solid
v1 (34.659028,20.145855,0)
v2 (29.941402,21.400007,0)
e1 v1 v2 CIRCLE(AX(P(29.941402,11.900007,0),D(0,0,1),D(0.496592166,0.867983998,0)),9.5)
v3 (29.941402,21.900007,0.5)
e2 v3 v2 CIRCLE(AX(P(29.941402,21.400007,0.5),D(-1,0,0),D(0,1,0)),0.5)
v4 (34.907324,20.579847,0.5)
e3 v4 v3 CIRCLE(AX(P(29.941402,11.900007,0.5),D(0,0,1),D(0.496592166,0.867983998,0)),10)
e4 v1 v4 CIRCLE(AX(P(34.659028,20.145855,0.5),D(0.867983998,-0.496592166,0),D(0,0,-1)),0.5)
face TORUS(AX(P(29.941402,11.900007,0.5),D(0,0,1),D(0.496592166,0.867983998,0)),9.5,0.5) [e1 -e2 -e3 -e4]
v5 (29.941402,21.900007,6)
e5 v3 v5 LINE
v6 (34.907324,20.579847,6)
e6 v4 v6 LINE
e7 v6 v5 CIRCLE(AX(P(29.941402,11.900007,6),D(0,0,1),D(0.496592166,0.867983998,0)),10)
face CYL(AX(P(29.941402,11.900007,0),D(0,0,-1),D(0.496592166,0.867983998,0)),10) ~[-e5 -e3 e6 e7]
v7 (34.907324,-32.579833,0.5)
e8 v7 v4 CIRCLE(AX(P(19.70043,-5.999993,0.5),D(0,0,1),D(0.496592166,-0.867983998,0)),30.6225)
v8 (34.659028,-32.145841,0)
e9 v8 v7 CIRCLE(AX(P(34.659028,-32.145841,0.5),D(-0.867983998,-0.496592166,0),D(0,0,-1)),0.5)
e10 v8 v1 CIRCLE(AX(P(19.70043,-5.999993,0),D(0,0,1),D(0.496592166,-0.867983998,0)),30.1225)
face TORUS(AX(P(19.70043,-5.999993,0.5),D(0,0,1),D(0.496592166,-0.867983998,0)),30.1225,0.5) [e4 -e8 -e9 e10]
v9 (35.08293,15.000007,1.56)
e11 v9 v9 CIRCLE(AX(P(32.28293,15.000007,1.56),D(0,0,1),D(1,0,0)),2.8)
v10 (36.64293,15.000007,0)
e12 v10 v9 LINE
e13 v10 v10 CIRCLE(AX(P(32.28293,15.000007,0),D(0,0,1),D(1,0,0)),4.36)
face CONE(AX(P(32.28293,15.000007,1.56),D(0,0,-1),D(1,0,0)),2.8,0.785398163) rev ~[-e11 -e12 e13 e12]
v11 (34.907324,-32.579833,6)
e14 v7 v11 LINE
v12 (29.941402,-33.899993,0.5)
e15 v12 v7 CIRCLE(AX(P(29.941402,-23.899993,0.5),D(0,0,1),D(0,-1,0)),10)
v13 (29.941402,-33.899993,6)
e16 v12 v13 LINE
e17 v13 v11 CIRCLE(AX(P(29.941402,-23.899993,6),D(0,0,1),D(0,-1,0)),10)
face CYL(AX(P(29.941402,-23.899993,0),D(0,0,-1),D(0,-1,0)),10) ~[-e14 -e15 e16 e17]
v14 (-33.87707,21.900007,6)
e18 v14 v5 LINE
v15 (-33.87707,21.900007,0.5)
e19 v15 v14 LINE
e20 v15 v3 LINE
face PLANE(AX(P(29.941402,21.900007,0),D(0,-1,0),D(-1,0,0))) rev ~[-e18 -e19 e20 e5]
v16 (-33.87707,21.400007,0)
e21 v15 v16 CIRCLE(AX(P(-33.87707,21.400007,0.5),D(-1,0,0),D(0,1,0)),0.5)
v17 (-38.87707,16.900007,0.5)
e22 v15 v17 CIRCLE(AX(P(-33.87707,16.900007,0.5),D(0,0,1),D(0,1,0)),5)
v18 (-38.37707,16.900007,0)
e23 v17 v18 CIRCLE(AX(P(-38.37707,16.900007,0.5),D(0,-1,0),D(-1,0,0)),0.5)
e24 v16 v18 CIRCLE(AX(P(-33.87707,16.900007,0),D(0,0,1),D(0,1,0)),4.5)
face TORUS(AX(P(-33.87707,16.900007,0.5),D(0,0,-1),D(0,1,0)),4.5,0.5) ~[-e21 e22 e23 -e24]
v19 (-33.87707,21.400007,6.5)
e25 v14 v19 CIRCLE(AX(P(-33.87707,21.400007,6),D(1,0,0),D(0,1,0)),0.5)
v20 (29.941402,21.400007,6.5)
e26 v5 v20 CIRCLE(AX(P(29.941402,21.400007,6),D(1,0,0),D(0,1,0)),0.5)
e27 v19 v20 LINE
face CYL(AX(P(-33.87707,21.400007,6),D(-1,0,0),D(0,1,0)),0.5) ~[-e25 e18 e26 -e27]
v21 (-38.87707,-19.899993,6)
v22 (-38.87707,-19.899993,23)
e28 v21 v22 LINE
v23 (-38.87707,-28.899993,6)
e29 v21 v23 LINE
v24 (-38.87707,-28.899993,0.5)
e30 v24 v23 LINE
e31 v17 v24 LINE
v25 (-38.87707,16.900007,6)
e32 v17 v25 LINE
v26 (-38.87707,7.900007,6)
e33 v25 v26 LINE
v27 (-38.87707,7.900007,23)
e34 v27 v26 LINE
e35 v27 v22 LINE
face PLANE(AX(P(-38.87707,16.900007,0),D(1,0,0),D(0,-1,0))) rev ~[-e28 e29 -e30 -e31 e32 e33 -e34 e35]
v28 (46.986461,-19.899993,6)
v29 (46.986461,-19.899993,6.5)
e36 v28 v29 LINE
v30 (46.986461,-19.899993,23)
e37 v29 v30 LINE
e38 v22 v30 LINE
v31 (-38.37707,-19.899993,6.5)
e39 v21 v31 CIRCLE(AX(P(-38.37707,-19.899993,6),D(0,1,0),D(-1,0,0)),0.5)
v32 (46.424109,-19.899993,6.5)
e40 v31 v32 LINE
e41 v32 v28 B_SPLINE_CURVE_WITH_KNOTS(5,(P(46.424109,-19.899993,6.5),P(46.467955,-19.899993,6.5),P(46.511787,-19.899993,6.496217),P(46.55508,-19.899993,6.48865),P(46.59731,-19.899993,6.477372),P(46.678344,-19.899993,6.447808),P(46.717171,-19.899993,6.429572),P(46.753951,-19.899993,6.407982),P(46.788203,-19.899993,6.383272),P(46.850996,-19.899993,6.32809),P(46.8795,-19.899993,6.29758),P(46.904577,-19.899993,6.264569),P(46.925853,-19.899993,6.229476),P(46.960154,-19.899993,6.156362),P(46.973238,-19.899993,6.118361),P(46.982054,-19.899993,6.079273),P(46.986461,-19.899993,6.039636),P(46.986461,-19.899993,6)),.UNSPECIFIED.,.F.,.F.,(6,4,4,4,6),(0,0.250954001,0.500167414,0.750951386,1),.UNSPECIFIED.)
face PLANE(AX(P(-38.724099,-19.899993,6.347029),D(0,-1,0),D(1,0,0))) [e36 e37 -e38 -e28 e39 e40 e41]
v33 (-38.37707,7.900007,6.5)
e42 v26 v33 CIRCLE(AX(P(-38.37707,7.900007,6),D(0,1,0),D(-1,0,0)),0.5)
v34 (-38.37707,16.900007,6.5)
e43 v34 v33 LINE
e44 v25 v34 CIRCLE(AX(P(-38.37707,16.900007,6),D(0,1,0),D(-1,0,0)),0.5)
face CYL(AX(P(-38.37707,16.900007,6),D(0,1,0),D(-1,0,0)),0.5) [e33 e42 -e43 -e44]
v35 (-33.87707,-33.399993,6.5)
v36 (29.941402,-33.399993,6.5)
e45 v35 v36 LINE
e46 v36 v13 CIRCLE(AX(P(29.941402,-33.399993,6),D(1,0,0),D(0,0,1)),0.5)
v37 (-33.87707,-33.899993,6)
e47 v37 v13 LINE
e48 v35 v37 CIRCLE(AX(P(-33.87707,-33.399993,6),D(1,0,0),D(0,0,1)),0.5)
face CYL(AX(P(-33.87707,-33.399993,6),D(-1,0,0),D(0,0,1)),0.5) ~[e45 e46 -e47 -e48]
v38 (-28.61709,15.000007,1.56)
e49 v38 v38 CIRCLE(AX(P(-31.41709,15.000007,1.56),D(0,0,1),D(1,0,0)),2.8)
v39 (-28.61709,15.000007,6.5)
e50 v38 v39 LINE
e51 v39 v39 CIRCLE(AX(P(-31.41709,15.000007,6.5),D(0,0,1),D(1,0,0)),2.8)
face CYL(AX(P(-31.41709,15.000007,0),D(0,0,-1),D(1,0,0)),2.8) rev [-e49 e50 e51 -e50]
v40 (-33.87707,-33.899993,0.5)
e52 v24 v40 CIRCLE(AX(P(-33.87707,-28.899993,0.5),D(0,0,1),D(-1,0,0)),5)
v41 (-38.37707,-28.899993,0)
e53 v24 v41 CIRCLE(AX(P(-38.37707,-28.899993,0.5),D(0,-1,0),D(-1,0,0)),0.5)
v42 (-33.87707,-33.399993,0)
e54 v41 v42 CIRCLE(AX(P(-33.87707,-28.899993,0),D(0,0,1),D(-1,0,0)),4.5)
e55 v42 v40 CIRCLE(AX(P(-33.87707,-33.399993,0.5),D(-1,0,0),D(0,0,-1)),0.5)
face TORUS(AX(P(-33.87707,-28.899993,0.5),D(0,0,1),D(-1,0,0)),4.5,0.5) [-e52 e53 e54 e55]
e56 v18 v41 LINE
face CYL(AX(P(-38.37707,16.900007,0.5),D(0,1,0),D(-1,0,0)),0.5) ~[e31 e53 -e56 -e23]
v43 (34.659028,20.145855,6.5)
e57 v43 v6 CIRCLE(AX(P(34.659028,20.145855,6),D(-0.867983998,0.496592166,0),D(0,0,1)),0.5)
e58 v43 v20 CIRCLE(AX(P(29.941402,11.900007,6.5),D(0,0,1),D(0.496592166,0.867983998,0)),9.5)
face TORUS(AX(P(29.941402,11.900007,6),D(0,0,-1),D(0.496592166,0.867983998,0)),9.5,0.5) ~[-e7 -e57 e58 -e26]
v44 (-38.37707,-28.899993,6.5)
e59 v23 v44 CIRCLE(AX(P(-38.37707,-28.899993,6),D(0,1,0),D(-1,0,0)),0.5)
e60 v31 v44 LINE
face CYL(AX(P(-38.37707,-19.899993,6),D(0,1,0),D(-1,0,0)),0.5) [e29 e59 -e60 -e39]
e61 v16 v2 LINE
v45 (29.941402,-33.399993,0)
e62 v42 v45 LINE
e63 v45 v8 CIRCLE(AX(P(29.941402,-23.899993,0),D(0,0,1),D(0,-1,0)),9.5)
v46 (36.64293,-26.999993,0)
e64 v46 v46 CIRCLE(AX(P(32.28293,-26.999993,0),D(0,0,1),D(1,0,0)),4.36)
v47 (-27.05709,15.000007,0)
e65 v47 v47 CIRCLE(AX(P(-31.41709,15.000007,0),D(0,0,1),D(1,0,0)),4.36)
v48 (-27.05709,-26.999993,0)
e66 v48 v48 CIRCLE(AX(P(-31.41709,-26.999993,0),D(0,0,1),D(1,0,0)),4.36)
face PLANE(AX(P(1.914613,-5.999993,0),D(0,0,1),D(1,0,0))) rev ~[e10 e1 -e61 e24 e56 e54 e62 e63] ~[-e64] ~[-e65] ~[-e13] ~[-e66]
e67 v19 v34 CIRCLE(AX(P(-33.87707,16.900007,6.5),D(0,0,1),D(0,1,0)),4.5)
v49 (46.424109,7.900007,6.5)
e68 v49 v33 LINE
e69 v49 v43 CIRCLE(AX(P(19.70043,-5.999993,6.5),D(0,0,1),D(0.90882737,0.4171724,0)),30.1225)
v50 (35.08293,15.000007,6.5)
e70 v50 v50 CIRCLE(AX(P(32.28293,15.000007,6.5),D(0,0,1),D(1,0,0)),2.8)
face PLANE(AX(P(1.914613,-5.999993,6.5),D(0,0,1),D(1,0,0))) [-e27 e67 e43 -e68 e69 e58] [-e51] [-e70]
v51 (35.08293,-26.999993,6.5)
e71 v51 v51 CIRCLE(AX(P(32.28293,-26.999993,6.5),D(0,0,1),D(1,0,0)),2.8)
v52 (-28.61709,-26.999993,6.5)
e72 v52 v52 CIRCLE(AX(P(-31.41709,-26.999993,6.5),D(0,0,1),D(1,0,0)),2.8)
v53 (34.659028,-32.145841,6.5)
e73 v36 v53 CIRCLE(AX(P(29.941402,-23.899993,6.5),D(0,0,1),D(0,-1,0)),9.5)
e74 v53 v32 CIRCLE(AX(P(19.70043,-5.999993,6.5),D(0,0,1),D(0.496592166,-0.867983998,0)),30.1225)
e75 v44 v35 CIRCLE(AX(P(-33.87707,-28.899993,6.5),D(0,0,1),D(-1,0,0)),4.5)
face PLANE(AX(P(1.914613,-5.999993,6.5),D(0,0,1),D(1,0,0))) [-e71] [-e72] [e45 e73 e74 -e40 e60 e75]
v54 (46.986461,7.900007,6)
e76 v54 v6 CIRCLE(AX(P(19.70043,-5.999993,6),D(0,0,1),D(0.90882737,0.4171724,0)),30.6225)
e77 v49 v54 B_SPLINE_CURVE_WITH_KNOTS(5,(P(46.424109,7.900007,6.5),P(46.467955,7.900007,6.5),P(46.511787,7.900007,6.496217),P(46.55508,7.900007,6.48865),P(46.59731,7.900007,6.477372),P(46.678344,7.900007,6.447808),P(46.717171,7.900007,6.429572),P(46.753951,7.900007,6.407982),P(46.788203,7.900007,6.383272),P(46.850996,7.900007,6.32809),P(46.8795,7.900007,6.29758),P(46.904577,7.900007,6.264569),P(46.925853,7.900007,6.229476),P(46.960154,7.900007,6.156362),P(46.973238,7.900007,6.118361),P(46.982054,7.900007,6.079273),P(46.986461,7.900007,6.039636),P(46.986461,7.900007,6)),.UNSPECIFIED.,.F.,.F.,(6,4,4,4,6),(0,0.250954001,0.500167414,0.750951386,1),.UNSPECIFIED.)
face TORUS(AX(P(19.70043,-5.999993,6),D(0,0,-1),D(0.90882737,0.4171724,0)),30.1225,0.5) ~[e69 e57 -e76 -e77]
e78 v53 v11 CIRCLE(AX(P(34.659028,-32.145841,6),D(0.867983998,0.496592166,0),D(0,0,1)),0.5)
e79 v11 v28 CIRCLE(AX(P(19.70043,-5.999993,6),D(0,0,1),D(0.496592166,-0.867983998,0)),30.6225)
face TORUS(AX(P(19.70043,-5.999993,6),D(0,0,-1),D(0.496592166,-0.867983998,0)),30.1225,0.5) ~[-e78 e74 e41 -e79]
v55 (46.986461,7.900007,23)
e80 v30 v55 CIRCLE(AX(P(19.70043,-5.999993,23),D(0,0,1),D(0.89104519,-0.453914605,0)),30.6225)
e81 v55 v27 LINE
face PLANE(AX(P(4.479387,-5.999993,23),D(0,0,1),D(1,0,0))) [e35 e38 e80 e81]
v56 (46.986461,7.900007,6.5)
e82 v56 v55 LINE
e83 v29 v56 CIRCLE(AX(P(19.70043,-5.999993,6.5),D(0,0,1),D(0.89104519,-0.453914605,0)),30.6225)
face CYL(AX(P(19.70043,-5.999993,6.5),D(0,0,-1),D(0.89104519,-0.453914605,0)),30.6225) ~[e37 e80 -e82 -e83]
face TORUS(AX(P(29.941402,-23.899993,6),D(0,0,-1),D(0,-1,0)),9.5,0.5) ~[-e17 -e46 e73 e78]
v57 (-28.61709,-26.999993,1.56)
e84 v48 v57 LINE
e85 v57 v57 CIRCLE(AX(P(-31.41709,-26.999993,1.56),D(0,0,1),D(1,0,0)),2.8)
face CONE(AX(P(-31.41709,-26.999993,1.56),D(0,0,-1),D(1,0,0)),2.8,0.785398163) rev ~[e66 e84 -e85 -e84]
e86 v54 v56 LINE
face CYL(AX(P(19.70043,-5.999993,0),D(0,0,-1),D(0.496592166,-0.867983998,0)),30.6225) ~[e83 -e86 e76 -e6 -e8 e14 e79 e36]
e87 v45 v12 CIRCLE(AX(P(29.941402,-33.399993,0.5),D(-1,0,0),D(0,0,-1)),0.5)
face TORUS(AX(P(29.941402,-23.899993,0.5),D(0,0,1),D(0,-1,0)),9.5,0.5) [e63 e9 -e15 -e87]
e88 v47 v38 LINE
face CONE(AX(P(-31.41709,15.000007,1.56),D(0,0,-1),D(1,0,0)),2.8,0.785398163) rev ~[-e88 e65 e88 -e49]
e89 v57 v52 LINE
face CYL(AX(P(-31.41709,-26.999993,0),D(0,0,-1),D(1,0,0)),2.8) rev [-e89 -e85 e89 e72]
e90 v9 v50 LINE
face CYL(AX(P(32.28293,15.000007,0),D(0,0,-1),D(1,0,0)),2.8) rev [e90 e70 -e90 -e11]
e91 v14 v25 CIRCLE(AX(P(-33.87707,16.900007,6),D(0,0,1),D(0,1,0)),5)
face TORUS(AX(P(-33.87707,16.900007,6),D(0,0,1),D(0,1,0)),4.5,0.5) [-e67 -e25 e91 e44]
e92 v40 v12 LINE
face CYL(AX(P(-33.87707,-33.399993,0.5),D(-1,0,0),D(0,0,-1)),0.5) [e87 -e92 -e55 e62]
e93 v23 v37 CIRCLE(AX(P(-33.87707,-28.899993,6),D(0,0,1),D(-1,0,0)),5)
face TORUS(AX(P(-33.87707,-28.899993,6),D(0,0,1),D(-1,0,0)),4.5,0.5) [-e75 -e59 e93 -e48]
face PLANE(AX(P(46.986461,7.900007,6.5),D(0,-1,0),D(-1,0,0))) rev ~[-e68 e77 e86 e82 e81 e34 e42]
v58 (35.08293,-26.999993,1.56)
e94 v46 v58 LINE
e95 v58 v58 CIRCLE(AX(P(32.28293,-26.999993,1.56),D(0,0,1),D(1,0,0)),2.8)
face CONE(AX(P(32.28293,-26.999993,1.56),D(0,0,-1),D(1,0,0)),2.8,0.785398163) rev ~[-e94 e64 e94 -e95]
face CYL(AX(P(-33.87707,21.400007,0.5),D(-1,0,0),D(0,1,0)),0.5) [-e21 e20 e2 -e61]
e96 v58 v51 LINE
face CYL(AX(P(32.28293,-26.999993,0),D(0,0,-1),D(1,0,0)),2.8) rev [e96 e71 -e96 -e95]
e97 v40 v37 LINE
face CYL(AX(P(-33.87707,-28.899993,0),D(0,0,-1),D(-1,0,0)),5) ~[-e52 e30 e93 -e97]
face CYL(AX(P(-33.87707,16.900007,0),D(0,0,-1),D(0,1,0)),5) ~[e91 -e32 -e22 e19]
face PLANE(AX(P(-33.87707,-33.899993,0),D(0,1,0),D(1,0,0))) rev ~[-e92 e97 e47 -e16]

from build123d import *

# Parameters (mm, degrees)
F0_R         = 2.8
F1_DEPTH     = 6.5
F3_DEPTH     = 16.5
F4_T1_DEPTH  = 63.8184719387
F4_T3_DEPTH  = 45.8
F4_T5_DEPTH  = 9
F4_T7_DEPTH  = 9
F4_T10_ANGLE = 90
F4_T12_ANGLE = 120.4504110916
F4_T14_ANGLE = 90
F4_T16_ANGLE = 90
F4_T18_ANGLE = 29.7747944542
F4_T20_ANGLE = 29.7747944542
F4_T22_ANGLE = 29.7747944542
F4_T26_ANGLE = 35.5690080159
F4_T29_ANGLE = 90
F4_T33_ANGLE = 35.5690080159
F4_T36_ANGLE = 29.7747944542
F5_SIZE      = 1.56


# Not quite as in the source:
# - a fillet or chamfer that OpenCascade refuses, or shapes differently, is made with other operations: its cross-section is extruded or revolved along the edge and cut away or added


with BuildPart() as f1:
    # F0 (on Top) → F1 (new body)
    with BuildSketch(Plane.XY):
        with BuildLine():
            Line((-38.8770699501, 16.9000072956), (-38.8770699501, -28.8999927044))
            ThreePointArc((-38.8770699501, -28.8999927044), (-37.412603856, -32.4355266103), (-33.8770699501, -33.8999927044))
            Line((-33.8770699501, -33.8999927044), (29.9414019886, -33.8999927044))
            ThreePointArc((29.9414019886, -33.8999927044), (32.5106042183, -33.5643188528), (34.9073236464, -32.579832685))
            ThreePointArc((34.9073236464, -32.579832685), (50.3229300499, -5.9999927044), (34.9073236464, 20.5798472762))
            ThreePointArc((34.9073236464, 20.5798472762), (32.5106042183, 21.564333444), (29.9414019886, 21.9000072956))
            Line((29.9414019886, 21.9000072956), (-33.8770699501, 21.9000072956))
            ThreePointArc((-33.8770699501, 21.9000072956), (-37.412603856, 20.4355412015), (-38.8770699501, 16.9000072956))
        make_face()
        with Locations((-31.4170904458, -26.9999932498)):
            Circle(F0_R, mode=Mode.SUBTRACT)
        with Locations((32.2829300499, -26.9999927044)):
            Circle(F0_R, mode=Mode.SUBTRACT)
        with Locations((-31.4170904458, 15.0000071153)):
            Circle(F0_R, mode=Mode.SUBTRACT)
        with Locations((32.2829300499, 15.0000072956)):
            Circle(F0_R, mode=Mode.SUBTRACT)
    extrude(amount=F1_DEPTH)

    # F2 (on face) → F3 (join)
    with BuildSketch(Plane.XY.offset(6.5)):
        with BuildLine():
            Line((-38.8770699501, 7.9000072956), (-38.8770699501, -5.9999927044))
            Line((-38.8770699501, -5.9999927044), (-38.8770699501, -19.8999927044))
            Line((-38.8770699501, -19.8999927044), (46.9864613892, -19.8999927044))
            ThreePointArc((46.9864613892, -19.8999927044), (50.3229300499, -5.9999927044), (46.9864613892, 7.9000072956))
            Line((46.9864613892, 7.9000072956), (-38.8770699501, 7.9000072956))
        make_face()
    extrude(amount=F3_DEPTH)

    # F4: fillet of radius 0.5 on 18 edges, made by hand

    # F4_s2 → F4_t1 (cut)
    with BuildSketch(Plane.YZ.offset(-33.8770699501)):
        with BuildLine():
            ThreePointArc((21.9000072956, 0.5), (21.7535606862, 0.1464466094), (21.4000072956, 0))
            Line((21.4000072956, 0), (21.9000072956, 0))
            Line((21.9000072956, 0), (21.9000072956, 0.5))
        make_face()
        with BuildLine():
            ThreePointArc((21.9000072956, 6), (21.7535606862, 6.3535533906), (21.4000072956, 6.5))
            Line((21.4000072956, 6.5), (21.9000072956, 6.5))
            Line((21.9000072956, 6.5), (21.9000072956, 6))
        make_face()
        with BuildLine():
            ThreePointArc((-33.3999927044, 6.5), (-33.753546095, 6.3535533906), (-33.8999927044, 6))
            Line((-33.8999927044, 6), (-33.8999927044, 6.5))
            Line((-33.8999927044, 6.5), (-33.3999927044, 6.5))
        make_face()
        with BuildLine():
            ThreePointArc((-33.3999927044, 0), (-33.753546095, 0.1464466094), (-33.8999927044, 0.5))
            Line((-33.8999927044, 0.5), (-33.8999927044, 0))
            Line((-33.8999927044, 0), (-33.3999927044, 0))
        make_face()
    extrude(amount=F4_T1_DEPTH, mode=Mode.SUBTRACT)

    # F4_s4 → F4_t3 (cut)
    with BuildSketch(Plane.XZ.offset(-16.9000072956)):
        with BuildLine():
            ThreePointArc((-38.8770699501, 0.5), (-38.7306233407, 0.1464466094), (-38.3770699501, 0))
            Line((-38.3770699501, 0), (-38.8770699501, 0))
            Line((-38.8770699501, 0), (-38.8770699501, 0.5))
        make_face()
    extrude(amount=F4_T3_DEPTH, mode=Mode.SUBTRACT)

    # F4_s6 → F4_t5 (cut)
    with BuildSketch(Plane.XZ.offset(-16.9000072956)):
        with BuildLine():
            ThreePointArc((-38.8770699501, 6), (-38.7306233407, 6.3535533906), (-38.3770699501, 6.5))
            Line((-38.3770699501, 6.5), (-38.8770699501, 6.5))
            Line((-38.8770699501, 6.5), (-38.8770699501, 6))
        make_face()
    extrude(amount=F4_T5_DEPTH, mode=Mode.SUBTRACT)

    # F4_s8 → F4_t7 (cut)
    with BuildSketch(Plane.XZ.offset(19.8999927044)):
        with BuildLine():
            ThreePointArc((-38.8770699501, 6), (-38.7306233407, 6.3535533906), (-38.3770699501, 6.5))
            Line((-38.3770699501, 6.5), (-38.8770699501, 6.5))
            Line((-38.8770699501, 6.5), (-38.8770699501, 6))
        make_face()
    extrude(amount=F4_T7_DEPTH, mode=Mode.SUBTRACT)

    # F4_s9 → F4_t10 (revolve, cut)
    with BuildSketch(Plane.YZ.offset(-33.8770699501)):
        with BuildLine():
            ThreePointArc((21.9000072956, 0.5), (21.7535606862, 0.1464466094), (21.4000072956, 0))
            Line((21.4000072956, 0), (21.9000072956, 0))
            Line((21.9000072956, 0), (21.9000072956, 0.5))
        make_face()
    revolve(axis=Axis((-33.8770699501, 16.9000072956, 0), (0, 0, 1)), revolution_arc=F4_T10_ANGLE, mode=Mode.SUBTRACT)

    # F4_s11 → F4_t12 (revolve, cut)
    with BuildSketch(Plane(origin=(12.2560283734, 7.0119353437, 0), x_dir=(0, 0, 1), z_dir=(-0.8679839981, -0.4965921658, 0))):
        with BuildLine():
            ThreePointArc((0, -45.1134768811), (0.1464466094, -45.4670302717), (0.5, -45.6134768811))
            Line((0.5, -45.6134768811), (0, -45.6134768811))
            Line((0, -45.6134768811), (0, -45.1134768811))
        make_face()
    revolve(axis=Axis((19.7004300499, -5.9999927044, 0), (0, 0, 1)), revolution_arc=F4_T12_ANGLE, mode=Mode.SUBTRACT)

    # F4_s13 → F4_t14 (revolve, cut)
    with BuildSketch(Plane.YZ.offset(-33.8770699501)):
        with BuildLine():
            ThreePointArc((21.9000072956, 6), (21.7535606862, 6.3535533906), (21.4000072956, 6.5))
            Line((21.4000072956, 6.5), (21.9000072956, 6.5))
            Line((21.9000072956, 6.5), (21.9000072956, 6))
        make_face()
    revolve(axis=Axis((-33.8770699501, 16.9000072956, 6.5), (0, 0, 1)), revolution_arc=F4_T14_ANGLE, mode=Mode.SUBTRACT)

    # F4_s15 → F4_t16 (revolve, cut)
    with BuildSketch(Plane.XZ.offset(28.8999927044)):
        with BuildLine():
            ThreePointArc((-38.3770699501, 0), (-38.7306233407, 0.1464466094), (-38.8770699501, 0.5))
            Line((-38.8770699501, 0.5), (-38.8770699501, 0))
            Line((-38.8770699501, 0), (-38.3770699501, 0))
        make_face()
    revolve(axis=Axis((-33.8770699501, -28.8999927044, 0), (0, 0, 1)), revolution_arc=F4_T16_ANGLE, mode=Mode.SUBTRACT)

    # F4_s17 → F4_t18 (revolve, cut)
    with BuildSketch(Plane.YZ.offset(29.9414019886)):
        with BuildLine():
            ThreePointArc((-33.3999927044, 0), (-33.753546095, 0.1464466094), (-33.8999927044, 0.5))
            Line((-33.8999927044, 0.5), (-33.8999927044, 0))
            Line((-33.8999927044, 0), (-33.3999927044, 0))
        make_face()
    revolve(axis=Axis((29.9414019886, -23.8999927044, 0), (0, 0, 1)), revolution_arc=F4_T18_ANGLE, mode=Mode.SUBTRACT)

    # F4_s19 → F4_t20 (revolve, cut)
    with BuildSketch(Plane(origin=(17.4284307256, -9.9711770948, 0), x_dir=(0, 0, 1), z_dir=(0.8679839981, -0.4965921658, 0))):
        with BuildLine():
            ThreePointArc((0, -34.6976815693), (0.1464466094, -35.0512349599), (0.5, -35.1976815693))
            Line((0.5, -35.1976815693), (0, -35.1976815693))
            Line((0, -35.1976815693), (0, -34.6976815693))
        make_face()
    revolve(axis=Axis((29.9414019886, 11.9000072956, 0), (0, 0, 1)), revolution_arc=F4_T20_ANGLE, mode=Mode.SUBTRACT)

    # F4_s21 → F4_t22 (revolve, cut)
    with BuildSketch(Plane(origin=(17.4284307256, -9.9711770948, 0), x_dir=(0, 0, 1), z_dir=(0.8679839981, -0.4965921658, 0))):
        with BuildLine():
            ThreePointArc((6.5, -34.6976815693), (6.3535533906, -35.0512349599), (6, -35.1976815693))
            Line((6, -35.1976815693), (6.5, -35.1976815693))
            Line((6.5, -35.1976815693), (6.5, -34.6976815693))
        make_face()
    revolve(axis=Axis((29.9414019886, 11.9000072956, 6.5), (0, 0, 1)), revolution_arc=F4_T22_ANGLE, mode=Mode.SUBTRACT)


with BuildPart() as f4_tool24:
    # F4_s25 → F4_t26 (revolve)
    with BuildSketch(Plane(origin=(5.7033446243, -12.4249727464, 0), x_dir=(0, 0, 1), z_dir=(0.4171723997, -0.9088273703, 0))):
        with BuildLine():
            ThreePointArc((6.5, -45.5237586807), (6.3535533906, -45.8773120713), (6, -46.0237586807))
            Line((6, -46.0237586807), (6.5, -46.0237586807))
            Line((6.5, -46.0237586807), (6.5, -45.5237586807))
        make_face()
    revolve(axis=Axis((19.7004300499, -5.9999927044, 6.5), (0, 0, 1)), revolution_arc=F4_T26_ANGLE)

    split(bisect_by=Plane.XZ.offset(-7.9000072956), keep=Keep.BOTTOM)


with BuildPart() as f1_1:
    add(f1.part)

    # F4_t23: cut F4_tool24
    add(f4_tool24.part, mode=Mode.SUBTRACT)

    # F4_s28 → F4_t29 (revolve, cut)
    with BuildSketch(Plane.XZ.offset(28.8999927044)):
        with BuildLine():
            ThreePointArc((-38.8770699501, 6), (-38.7306233407, 6.3535533906), (-38.3770699501, 6.5))
            Line((-38.3770699501, 6.5), (-38.8770699501, 6.5))
            Line((-38.8770699501, 6.5), (-38.8770699501, 6))
        make_face()
    revolve(axis=Axis((-33.8770699501, -28.8999927044, 6.5), (0, 0, 1)), revolution_arc=F4_T29_ANGLE, mode=Mode.SUBTRACT)


with BuildPart() as f4_tool31:
    # F4_s32 → F4_t33 (revolve)
    with BuildSketch(Plane(origin=(12.2560283734, 7.0119353437, 0), x_dir=(0, 0, 1), z_dir=(-0.8679839981, -0.4965921658, 0))):
        with BuildLine():
            ThreePointArc((6.5, -45.1134768811), (6.3535533906, -45.4670302717), (6, -45.6134768811))
            Line((6, -45.6134768811), (6.5, -45.6134768811))
            Line((6.5, -45.6134768811), (6.5, -45.1134768811))
        make_face()
    revolve(axis=Axis((19.7004300499, -5.9999927044, 6.5), (0, 0, 1)), revolution_arc=F4_T33_ANGLE)

    split(bisect_by=Plane.XZ.offset(19.8999927044), keep=Keep.TOP)


with BuildPart() as f1_2:
    add(f1_1.part)

    # F4_t30: cut F4_tool31
    add(f4_tool31.part, mode=Mode.SUBTRACT)

    # F4_s35 → F4_t36 (revolve, cut)
    with BuildSketch(Plane.YZ.offset(29.9414019886)):
        with BuildLine():
            ThreePointArc((-33.3999927044, 6.5), (-33.753546095, 6.3535533906), (-33.8999927044, 6))
            Line((-33.8999927044, 6), (-33.8999927044, 6.5))
            Line((-33.8999927044, 6.5), (-33.3999927044, 6.5))
        make_face()
    revolve(axis=Axis((29.9414019886, -23.8999927044, 6.5), (0, 0, 1)), revolution_arc=F4_T36_ANGLE, mode=Mode.SUBTRACT)

    # F5
    f5_edges = [f1_2.edges().sort_by_distance(p)[0] for p in [
        (-34.21709, 15.000007, 0),
        (-34.21709, -26.999993, 0),
        (29.48293, -26.999993, 0),
        (29.48293, 15.000007, 0),
    ]]
    chamfer(f5_edges, length=F5_SIZE)


solid = f1_2.part
